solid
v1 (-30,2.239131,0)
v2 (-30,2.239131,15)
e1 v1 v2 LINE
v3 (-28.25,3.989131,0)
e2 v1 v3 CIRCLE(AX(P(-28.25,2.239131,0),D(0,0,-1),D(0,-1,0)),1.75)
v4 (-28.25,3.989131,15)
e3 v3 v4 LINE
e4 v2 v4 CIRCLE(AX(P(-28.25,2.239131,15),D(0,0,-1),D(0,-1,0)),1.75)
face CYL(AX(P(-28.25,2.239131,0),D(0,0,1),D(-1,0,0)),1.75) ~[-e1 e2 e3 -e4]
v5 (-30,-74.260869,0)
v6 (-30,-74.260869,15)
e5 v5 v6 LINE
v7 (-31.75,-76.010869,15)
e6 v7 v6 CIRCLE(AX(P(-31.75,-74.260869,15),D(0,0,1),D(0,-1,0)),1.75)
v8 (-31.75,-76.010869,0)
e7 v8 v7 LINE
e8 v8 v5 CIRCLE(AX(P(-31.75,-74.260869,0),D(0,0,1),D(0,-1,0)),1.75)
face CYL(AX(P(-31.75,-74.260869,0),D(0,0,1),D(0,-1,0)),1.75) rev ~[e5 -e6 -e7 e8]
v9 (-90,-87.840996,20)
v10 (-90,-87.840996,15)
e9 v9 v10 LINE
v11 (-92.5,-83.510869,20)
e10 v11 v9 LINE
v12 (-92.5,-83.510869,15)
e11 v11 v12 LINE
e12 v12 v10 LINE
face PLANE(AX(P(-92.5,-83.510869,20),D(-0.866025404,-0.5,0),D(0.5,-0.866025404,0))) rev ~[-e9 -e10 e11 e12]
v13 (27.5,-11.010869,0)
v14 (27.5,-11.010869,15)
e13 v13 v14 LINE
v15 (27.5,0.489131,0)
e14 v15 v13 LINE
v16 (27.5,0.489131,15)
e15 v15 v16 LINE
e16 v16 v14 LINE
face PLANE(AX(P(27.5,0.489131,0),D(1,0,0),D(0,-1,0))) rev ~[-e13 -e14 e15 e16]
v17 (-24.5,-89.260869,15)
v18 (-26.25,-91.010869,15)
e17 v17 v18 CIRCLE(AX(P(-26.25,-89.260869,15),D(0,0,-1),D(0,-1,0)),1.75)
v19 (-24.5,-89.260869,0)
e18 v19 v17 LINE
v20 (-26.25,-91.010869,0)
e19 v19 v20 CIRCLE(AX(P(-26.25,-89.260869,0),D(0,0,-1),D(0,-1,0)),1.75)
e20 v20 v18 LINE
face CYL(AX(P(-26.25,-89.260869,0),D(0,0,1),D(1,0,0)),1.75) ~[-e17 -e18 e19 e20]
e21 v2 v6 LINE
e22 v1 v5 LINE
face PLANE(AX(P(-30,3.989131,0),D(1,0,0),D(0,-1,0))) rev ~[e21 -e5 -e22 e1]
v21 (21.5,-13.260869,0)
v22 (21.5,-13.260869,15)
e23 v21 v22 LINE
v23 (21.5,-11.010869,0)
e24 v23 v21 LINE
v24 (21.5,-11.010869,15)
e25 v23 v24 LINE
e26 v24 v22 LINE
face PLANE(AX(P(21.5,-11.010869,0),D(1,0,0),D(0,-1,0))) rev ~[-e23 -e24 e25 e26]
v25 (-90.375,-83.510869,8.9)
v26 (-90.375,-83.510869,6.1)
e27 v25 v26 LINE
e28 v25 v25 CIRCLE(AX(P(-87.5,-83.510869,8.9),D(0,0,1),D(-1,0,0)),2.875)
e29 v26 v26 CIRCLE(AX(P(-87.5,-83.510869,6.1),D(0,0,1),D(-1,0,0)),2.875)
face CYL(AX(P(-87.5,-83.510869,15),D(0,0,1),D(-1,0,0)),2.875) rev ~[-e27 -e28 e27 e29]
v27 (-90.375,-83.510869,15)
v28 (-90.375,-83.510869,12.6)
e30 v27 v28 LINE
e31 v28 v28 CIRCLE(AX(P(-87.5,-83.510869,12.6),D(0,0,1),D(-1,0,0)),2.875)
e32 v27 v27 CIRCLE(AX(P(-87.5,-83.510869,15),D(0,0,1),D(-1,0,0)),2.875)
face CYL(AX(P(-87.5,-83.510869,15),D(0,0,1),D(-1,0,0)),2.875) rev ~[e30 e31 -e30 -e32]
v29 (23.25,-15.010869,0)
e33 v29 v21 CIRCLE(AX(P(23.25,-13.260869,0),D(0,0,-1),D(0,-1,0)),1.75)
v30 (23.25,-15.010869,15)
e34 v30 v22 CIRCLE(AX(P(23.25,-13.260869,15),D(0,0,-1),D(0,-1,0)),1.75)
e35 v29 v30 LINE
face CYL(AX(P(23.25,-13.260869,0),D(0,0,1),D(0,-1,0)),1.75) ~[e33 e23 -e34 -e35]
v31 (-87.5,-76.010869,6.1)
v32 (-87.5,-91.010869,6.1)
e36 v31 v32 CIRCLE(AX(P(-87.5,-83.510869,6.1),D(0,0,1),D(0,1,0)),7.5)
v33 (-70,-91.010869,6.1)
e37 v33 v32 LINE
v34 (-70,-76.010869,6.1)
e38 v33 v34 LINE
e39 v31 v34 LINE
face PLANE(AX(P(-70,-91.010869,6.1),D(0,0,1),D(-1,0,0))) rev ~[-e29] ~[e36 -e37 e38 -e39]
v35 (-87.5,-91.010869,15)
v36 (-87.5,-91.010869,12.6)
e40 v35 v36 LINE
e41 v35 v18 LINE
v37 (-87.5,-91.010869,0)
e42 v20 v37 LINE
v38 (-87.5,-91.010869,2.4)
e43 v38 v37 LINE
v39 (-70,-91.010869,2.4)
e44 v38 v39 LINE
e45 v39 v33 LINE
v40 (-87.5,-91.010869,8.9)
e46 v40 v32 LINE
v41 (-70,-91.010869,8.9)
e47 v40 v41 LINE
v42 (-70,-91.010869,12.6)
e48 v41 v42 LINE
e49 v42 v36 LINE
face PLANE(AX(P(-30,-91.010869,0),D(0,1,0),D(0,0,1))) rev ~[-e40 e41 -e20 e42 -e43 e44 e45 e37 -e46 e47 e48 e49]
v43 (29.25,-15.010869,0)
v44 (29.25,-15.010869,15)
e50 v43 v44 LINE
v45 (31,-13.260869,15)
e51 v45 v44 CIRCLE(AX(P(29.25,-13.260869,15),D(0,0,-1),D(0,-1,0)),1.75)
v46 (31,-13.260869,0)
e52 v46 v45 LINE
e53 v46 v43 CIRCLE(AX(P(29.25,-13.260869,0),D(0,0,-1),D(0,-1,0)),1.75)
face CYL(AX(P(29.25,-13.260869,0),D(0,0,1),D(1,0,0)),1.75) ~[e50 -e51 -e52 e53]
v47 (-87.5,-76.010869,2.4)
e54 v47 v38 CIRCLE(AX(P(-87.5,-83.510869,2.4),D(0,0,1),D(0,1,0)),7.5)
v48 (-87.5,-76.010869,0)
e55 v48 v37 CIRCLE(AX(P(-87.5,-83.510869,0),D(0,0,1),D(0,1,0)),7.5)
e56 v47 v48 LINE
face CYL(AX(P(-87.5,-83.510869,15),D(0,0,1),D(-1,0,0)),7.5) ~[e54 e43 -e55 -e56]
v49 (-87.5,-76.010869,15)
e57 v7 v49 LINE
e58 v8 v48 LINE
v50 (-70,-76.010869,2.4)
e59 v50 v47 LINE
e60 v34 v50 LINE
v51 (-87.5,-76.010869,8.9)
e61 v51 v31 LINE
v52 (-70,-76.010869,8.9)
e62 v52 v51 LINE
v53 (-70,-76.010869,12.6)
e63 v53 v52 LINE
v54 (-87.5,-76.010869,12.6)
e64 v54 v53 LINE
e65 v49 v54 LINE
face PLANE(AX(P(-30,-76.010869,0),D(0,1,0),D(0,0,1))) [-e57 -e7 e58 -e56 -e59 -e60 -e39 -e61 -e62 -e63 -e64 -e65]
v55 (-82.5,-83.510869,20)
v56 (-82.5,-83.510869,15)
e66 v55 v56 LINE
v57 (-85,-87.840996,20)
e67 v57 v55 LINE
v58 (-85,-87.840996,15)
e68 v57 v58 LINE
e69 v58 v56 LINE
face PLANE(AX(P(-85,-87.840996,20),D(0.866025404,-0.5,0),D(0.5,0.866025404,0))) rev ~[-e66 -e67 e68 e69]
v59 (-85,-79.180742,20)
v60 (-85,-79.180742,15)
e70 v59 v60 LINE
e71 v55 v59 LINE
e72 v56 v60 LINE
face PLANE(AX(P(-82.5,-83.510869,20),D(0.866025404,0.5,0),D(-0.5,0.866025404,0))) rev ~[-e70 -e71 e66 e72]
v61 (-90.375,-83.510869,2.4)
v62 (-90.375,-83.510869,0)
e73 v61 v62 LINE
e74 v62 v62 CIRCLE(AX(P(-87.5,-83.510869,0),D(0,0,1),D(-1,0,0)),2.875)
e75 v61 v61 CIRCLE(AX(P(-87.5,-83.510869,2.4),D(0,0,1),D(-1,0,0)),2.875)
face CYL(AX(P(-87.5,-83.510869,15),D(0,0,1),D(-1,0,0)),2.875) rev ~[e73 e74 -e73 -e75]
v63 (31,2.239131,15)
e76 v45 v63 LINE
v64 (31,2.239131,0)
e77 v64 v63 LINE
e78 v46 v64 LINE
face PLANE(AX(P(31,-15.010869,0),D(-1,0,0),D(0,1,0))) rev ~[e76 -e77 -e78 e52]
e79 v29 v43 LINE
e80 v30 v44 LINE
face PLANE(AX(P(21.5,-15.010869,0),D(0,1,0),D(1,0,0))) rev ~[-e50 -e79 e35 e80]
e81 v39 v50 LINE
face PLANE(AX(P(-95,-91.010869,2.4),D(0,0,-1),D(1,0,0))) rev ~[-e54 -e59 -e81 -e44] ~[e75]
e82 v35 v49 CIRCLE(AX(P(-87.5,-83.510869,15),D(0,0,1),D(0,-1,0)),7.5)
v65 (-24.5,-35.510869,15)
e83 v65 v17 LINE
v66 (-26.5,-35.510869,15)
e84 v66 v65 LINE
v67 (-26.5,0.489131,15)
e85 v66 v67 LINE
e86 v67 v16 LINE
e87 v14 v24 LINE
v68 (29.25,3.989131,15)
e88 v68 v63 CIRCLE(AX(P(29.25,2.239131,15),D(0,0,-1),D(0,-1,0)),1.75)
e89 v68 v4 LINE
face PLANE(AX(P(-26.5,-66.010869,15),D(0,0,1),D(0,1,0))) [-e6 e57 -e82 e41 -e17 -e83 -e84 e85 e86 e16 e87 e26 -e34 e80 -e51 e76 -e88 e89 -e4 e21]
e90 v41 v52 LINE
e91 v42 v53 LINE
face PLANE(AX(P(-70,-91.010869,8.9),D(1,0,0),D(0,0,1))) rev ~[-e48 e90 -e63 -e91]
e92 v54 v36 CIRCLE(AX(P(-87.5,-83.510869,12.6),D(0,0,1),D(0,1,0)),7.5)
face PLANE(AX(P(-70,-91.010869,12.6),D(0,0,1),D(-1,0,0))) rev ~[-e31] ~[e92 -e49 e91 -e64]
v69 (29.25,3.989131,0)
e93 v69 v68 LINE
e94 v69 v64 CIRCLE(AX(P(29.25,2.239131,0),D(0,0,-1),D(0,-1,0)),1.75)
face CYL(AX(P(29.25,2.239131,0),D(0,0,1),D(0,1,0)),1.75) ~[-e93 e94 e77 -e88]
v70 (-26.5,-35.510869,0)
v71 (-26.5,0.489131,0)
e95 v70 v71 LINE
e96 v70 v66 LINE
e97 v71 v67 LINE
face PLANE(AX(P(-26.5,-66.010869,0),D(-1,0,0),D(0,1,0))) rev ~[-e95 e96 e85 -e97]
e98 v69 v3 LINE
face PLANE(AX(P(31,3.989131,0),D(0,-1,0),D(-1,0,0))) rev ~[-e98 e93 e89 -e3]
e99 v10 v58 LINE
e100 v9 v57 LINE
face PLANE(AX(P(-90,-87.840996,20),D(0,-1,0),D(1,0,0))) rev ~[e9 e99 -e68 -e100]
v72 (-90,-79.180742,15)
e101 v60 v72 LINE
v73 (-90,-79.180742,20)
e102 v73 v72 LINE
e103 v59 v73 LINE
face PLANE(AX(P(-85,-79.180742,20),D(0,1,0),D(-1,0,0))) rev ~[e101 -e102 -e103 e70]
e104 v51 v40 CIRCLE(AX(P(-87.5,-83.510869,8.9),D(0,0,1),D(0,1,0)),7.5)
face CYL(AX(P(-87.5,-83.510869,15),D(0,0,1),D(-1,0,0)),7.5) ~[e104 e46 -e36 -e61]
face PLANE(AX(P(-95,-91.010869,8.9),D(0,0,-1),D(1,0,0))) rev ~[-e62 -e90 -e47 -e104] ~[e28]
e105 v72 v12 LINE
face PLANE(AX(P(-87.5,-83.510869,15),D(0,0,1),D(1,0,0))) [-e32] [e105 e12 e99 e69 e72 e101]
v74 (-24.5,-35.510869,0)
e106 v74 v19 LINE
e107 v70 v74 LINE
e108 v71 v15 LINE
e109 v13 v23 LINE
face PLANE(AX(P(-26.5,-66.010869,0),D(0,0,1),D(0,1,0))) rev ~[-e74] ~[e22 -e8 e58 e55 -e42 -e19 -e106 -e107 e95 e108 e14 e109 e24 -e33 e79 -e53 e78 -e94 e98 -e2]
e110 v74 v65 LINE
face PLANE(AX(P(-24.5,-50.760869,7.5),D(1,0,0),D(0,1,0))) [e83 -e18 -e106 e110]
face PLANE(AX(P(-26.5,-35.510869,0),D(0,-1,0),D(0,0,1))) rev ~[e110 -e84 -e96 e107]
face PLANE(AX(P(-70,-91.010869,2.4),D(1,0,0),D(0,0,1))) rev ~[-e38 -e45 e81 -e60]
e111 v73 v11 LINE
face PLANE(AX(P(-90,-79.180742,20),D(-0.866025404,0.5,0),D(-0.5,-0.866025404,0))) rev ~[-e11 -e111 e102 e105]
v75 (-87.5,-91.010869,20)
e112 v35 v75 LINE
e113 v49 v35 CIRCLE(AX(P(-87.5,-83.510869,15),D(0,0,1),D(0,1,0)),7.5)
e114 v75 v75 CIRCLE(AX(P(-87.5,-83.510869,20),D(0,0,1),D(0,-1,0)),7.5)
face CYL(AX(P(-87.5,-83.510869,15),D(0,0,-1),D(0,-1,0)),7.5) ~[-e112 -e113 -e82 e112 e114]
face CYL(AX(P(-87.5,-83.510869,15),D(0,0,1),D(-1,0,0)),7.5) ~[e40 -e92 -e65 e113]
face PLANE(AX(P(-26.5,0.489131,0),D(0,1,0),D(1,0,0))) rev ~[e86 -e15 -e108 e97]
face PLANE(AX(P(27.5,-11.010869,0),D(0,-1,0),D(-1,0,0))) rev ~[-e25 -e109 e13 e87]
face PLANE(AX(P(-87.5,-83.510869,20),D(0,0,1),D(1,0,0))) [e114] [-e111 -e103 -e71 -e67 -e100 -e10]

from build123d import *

# Parameters (mm, degrees)
F0_W      = 2
F0_H      = 10
F0_H_2    = 15
F1_DEPTH  = 15
F2_W      = 15
F2_H      = 15
F3_DEPTH  = 65
F5_DEPTH  = 25
F6_DEPTH  = 5
F7_R      = 2.875
F8_DEPTH  = 5
F9_DEPTH  = 25
F10_W     = 10
F10_H     = 3.7
F10_W_2   = 7.5
F11_DEPTH = 25
F12_W     = 30.5
F12_H     = 15
F13_DEPTH = 2
F14_R     = 1.75


with BuildPart() as f1:
    # F0 (on Top) → F1 (new body)
    with BuildSketch(Plane.XY):
        with Locations((-25.5, -71.0108693689)):
            Rectangle(F0_W, F0_H)
        Polygon((31, 3.9891306311), (-30, 3.9891306311), (-30, -91.0108693689), (-26.5, -91.0108693689), (-26.5, -76.0108693689), (-26.5, -66.0108693689), (-26.5, 0.4891306311), (27.5, 0.4891306311), (27.5, -11.0108693689), (21.5, -11.0108693689), (21.5, -15.0108693689), (31, -15.0108693689), align=None)
        with Locations((-25.5, -83.5108693689)):
            Rectangle(F0_W, F0_H_2)
    extrude(amount=F1_DEPTH)

    # F2 (on face) → F3 (join)
    with BuildSketch(Plane(origin=(-30, 0, 0), x_dir=(0, -1, 0), z_dir=(-1, 0, 0))):
        with Locations((83.5108693689, 7.5)):
            Rectangle(F2_W, F2_H)
    extrude(amount=F3_DEPTH)

    # F4 (on face) → F5 (cut)
    with BuildSketch(Plane.XY.offset(15)):
        with BuildLine():
            ThreePointArc((-95, -83.5108693689), (-92.8033008589, -78.20756851), (-87.5, -76.0108693689))
            Line((-87.5, -76.0108693689), (-95, -76.0108693689))
            Line((-95, -76.0108693689), (-95, -83.5108693689))
        make_face()
        with BuildLine():
            Line((-95, -91.0108693689), (-87.5, -91.0108693689))
            ThreePointArc((-87.5, -91.0108693689), (-92.8033008589, -88.8141702278), (-95, -83.5108693689))
            Line((-95, -83.5108693689), (-95, -91.0108693689))
        make_face()
    extrude(amount=-F5_DEPTH, mode=Mode.SUBTRACT)

    # F4 (on face) → F6 (join)
    with BuildSketch(Plane.XY.offset(15)):
        with BuildLine():
            ThreePointArc((-80, -83.5108693689), (-82.1966991411, -78.20756851), (-87.5, -76.0108693689))
            ThreePointArc((-87.5, -76.0108693689), (-92.8033008589, -78.20756851), (-95, -83.5108693689))
            ThreePointArc((-95, -83.5108693689), (-92.8033008589, -88.8141702278), (-87.5, -91.0108693689))
            ThreePointArc((-87.5, -91.0108693689), (-82.1966991411, -88.8141702278), (-80, -83.5108693689))
        make_face()
        with BuildLine():
            ThreePointArc((-84.625, -83.5108693689), (-87.5, -86.3858693689), (-90.375, -83.5108693689))
            ThreePointArc((-90.375, -83.5108693689), (-87.5, -80.6358693689), (-84.625, -83.5108693689))
        make_face(mode=Mode.SUBTRACT)
    extrude(amount=F6_DEPTH)

    # F7 (on face) → F8 (cut)
    with BuildSketch(Plane.XY.offset(20)):
        Polygon((-85, -79.18074235), (-90, -79.18074235), (-92.5, -83.5108693689), (-90, -87.8409963878), (-85, -87.8409963878), (-82.5, -83.5108693689), align=None)
        with Locations((-87.5, -83.5108693689)):
            Circle(F7_R, mode=Mode.SUBTRACT)
    extrude(amount=-F8_DEPTH, mode=Mode.SUBTRACT)

    # F4 (on face) → F9 (cut)
    with BuildSketch(Plane.XY.offset(15)):
        with BuildLine():
            ThreePointArc((-84.625, -83.5108693689), (-87.5, -80.6358693689), (-90.375, -83.5108693689))
            ThreePointArc((-90.375, -83.5108693689), (-87.5, -86.3858693689), (-84.625, -83.5108693689))
        make_face()
    extrude(amount=-F9_DEPTH, mode=Mode.SUBTRACT)

    # F10 (on face) → F11 (cut)
    with BuildSketch(Plane.XZ.offset(91.0108693689)):
        with Locations((-75, 10.75)):
            Rectangle(F10_W, F10_H)
        with Locations((-91.25, 10.75)):
            Rectangle(F10_W_2, F10_H)
        with Locations((-83.75, 10.75)):
            Rectangle(F10_W_2, F10_H)
        with Locations((-83.75, 4.25)):
            Rectangle(F10_W_2, F10_H)
        with Locations((-91.25, 4.25)):
            Rectangle(F10_W_2, F10_H)
        with Locations((-75, 4.25)):
            Rectangle(F10_W, F10_H)
    extrude(amount=-F11_DEPTH, mode=Mode.SUBTRACT)

    # F12 (on face) → F13 (join)
    with BuildSketch(Plane.YZ.offset(-26.5)):
        with Locations((-50.7608693689, 7.5)):
            Rectangle(F12_W, F12_H)
    extrude(amount=F13_DEPTH)

    # F14
    f14_edges = [f1.edges().sort_by_distance(p)[0] for p in [
        (-30, -76.010869, 7.5),
        (-30, 3.989131, 7.5),
        (31, 3.989131, 7.5),
        (31, -15.010869, 7.5),
        (21.5, -15.010869, 7.5),
        (-24.5, -91.010869, 7.5),
    ]]
    fillet(f14_edges, radius=F14_R)


solid = f1.part
